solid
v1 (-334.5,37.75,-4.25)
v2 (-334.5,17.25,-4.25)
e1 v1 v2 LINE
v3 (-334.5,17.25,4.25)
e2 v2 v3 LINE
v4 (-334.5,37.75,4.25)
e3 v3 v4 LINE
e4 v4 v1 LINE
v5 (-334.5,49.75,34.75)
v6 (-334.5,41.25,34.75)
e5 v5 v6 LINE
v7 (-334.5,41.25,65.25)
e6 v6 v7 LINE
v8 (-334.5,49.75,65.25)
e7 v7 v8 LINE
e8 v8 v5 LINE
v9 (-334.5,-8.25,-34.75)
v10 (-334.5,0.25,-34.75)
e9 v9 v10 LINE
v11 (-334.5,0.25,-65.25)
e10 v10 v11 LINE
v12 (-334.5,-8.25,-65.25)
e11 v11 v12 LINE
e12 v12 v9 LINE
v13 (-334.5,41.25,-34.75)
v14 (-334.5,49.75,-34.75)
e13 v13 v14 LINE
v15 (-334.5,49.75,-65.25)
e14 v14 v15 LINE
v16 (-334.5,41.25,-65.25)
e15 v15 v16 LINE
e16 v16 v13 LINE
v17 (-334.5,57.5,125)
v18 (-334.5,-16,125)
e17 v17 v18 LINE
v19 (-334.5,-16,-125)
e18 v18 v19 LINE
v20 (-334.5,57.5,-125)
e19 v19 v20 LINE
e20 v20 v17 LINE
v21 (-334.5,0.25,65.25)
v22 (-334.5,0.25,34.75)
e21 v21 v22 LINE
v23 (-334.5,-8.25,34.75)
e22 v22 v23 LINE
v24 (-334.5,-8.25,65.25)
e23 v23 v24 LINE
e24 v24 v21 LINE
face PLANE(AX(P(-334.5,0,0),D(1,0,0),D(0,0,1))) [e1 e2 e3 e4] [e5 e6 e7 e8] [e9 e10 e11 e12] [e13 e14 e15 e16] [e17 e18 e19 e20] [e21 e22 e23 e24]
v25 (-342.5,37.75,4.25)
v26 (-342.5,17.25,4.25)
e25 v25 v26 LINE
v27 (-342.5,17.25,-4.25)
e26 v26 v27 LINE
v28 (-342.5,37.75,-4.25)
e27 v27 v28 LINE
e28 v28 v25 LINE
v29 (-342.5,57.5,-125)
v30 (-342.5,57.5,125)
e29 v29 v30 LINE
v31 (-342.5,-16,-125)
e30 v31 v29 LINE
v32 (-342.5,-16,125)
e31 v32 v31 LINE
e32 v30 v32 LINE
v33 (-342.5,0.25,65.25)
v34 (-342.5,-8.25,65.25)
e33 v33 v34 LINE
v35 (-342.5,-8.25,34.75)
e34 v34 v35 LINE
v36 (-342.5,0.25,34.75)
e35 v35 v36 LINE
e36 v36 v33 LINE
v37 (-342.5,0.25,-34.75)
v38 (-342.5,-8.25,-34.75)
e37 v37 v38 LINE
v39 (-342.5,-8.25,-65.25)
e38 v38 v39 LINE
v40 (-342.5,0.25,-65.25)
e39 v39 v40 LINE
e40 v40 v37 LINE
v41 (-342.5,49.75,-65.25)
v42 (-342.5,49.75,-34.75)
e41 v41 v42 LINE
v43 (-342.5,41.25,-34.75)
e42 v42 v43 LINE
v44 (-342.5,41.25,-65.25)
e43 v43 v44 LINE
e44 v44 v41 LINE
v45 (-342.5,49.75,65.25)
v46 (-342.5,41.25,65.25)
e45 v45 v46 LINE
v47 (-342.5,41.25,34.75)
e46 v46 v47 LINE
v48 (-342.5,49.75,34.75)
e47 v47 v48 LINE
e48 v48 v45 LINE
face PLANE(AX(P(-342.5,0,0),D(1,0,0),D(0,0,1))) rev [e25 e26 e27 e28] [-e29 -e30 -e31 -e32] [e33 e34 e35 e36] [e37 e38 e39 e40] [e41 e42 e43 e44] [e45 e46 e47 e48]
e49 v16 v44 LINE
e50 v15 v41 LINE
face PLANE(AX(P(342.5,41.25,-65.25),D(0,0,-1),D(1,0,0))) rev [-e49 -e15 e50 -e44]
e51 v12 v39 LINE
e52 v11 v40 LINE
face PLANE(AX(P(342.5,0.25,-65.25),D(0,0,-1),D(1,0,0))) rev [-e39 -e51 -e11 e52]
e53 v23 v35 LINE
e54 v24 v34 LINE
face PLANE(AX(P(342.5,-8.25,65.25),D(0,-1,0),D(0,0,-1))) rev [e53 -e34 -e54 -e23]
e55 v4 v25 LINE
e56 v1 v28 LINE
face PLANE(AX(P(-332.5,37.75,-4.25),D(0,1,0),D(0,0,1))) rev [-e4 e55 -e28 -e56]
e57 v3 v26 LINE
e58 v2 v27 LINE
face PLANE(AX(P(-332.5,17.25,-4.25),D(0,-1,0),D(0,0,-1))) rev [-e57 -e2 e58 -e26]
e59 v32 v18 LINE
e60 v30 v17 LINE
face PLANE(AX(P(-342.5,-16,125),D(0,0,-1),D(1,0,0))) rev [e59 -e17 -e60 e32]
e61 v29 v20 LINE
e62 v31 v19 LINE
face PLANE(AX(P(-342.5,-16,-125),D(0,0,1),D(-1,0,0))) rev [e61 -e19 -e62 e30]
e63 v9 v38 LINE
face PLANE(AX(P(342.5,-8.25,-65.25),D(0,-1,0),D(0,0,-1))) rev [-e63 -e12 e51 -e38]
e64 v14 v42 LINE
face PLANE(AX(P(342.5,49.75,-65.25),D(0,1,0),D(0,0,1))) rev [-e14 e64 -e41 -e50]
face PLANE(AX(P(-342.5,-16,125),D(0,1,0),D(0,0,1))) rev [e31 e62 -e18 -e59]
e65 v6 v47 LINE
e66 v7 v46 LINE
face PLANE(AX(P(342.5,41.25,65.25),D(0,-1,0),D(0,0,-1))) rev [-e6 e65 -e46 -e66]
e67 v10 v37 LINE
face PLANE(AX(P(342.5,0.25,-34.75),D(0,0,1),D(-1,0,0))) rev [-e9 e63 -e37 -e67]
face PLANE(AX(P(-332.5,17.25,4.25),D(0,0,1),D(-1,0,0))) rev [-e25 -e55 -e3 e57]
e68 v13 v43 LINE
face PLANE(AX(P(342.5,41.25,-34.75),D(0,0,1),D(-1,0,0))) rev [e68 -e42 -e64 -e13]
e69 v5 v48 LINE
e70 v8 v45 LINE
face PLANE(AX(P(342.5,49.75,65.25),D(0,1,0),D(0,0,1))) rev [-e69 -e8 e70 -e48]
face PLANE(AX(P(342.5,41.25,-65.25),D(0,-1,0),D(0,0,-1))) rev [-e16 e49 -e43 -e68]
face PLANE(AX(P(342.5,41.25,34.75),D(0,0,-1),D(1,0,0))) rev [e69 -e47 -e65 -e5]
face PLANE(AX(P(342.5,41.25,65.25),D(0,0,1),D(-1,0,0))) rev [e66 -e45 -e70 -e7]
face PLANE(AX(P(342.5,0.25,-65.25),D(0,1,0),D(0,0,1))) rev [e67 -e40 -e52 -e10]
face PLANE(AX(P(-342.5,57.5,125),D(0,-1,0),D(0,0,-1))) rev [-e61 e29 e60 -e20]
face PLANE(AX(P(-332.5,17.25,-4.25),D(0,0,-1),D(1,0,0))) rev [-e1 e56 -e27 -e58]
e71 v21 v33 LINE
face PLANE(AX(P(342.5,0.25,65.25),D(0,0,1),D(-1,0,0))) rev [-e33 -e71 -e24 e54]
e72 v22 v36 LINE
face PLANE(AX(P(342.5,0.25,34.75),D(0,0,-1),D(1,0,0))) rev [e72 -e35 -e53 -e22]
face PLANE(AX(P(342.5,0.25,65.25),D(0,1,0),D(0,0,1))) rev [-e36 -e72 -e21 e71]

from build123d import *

# Parameters (mm, degrees)
SKETCH1_W           = 685
SKETCH1_H           = 250
BASE_FLANGE1_DEPTH  = 8
SKETCH6_W           = 60
SKETCH6_H           = 8
SKETCH6_W_2         = 70
EXTRUDE1_DEPTH      = 8
SKETCH7_W           = 250
SKETCH7_H           = 73.5
BASE_FLANGE2_DEPTH  = 8
SKETCH12_W          = 30.5
SKETCH12_H          = 8.5
EXTRUDE2_DEPTH      = 699.681794525
SKETCH14_W          = 250
SKETCH14_H          = 8
BASE_FLANGE3_DEPTH  = 50.5
SKETCH19_W          = 60
SKETCH19_H          = 8
SKETCH19_W_2        = 70
EXTRUDE3_DEPTH      = 8
BREAK_CORNER1_START = 41.5
BREAK_CORNER1_DEPTH = 8
EXTRUDE4_DEPTH      = 8
BASE_FLANGE4_DEPTH  = 8
SKETCH38_W          = 8.5
SKETCH38_H          = 20.5
EXTRUDE5_DEPTH      = 10
SKETCH39_W          = 20.5
SKETCH39_H          = 8.5
EXTRUDE6_DEPTH      = 10


# Read off the part's stored shape, not the designer's step: Break-Corner1
# Sheet-metal steps are written as plain solids
with BuildPart() as part:
    # Sketch1 → Base-Flange1 (new body)
    with BuildSketch(Plane(origin=(0, 0, 0), x_dir=(1, 0, 0), z_dir=(0, 1, 0))):
        Rectangle(SKETCH1_W, SKETCH1_H)
    extrude(amount=-BASE_FLANGE1_DEPTH)

    # Sketch6 → Extrude1 (cut)
    with BuildSketch(Plane(origin=(342.5, 0, 0), x_dir=(0, 0, -1), z_dir=(1, 0, 0))):
        with Locations((-95, -4)):
            Rectangle(SKETCH6_W, SKETCH6_H)
        with Locations((95, -4)):
            Rectangle(SKETCH6_W, SKETCH6_H)
        with Locations((0, -4)):
            Rectangle(SKETCH6_W_2, SKETCH6_H)
    extrude1 = extrude(amount=-EXTRUDE1_DEPTH, mode=Mode.SUBTRACT)

    # Mirror1: Extrude1 across plane
    add(extrude1.mirror(Plane(origin=(0, 0, 0), x_dir=(0, 0, 1), z_dir=(1, 0, 0))), mode=Mode.SUBTRACT)

    # Sketch39 → Extrude6 (cut)
    with BuildSketch(Plane.XZ.offset(8)):
        with Locations((289.5, 0)):
            Rectangle(SKETCH39_W, SKETCH39_H)
        with Locations((229.5, 0)):
            Rectangle(SKETCH39_W, SKETCH39_H)
        with Locations((-289.5, 0)):
            Rectangle(SKETCH39_W, SKETCH39_H)
        with Locations((-229.5, 0)):
            Rectangle(SKETCH39_W, SKETCH39_H)
    extrude(amount=-EXTRUDE6_DEPTH, mode=Mode.SUBTRACT)


with BuildPart() as body_2:
    # Sketch7 → Base-Flange2 (new body)
    with BuildSketch(Plane(origin=(334.5, 0, 0), x_dir=(0, 0, -1), z_dir=(1, 0, 0))):
        with Locations((0, 20.75)):
            Rectangle(SKETCH7_W, SKETCH7_H)
    extrude(amount=BASE_FLANGE2_DEPTH)

    # Sketch12 → Extrude2 (cut, through all)
    with BuildSketch(Plane(origin=(342.5, 0, 0), x_dir=(0, 0, -1), z_dir=(1, 0, 0))):
        with Locations((-50, -4)):
            Rectangle(SKETCH12_W, SKETCH12_H)
        with Locations((50, -4)):
            Rectangle(SKETCH12_W, SKETCH12_H)
        with Locations((50, 45.5)):
            Rectangle(SKETCH12_W, SKETCH12_H)
        with Locations((-50, 45.5)):
            Rectangle(SKETCH12_W, SKETCH12_H)
    extrude(amount=-EXTRUDE2_DEPTH, mode=Mode.SUBTRACT)

    # Sketch38 → Extrude5 (cut)
    with BuildSketch(Plane(origin=(342.5, 0, 0), x_dir=(0, 0, -1), z_dir=(1, 0, 0))):
        with Locations((0, 27.5)):
            Rectangle(SKETCH38_W, SKETCH38_H)
    extrude(amount=-EXTRUDE5_DEPTH, mode=Mode.SUBTRACT)


with BuildPart() as body_3:
    # Sketch14 → Base-Flange3 (new body)
    with BuildSketch(Plane.ZY.offset(-334.5)):
        with Locations((0, 45.5)):
            Rectangle(SKETCH14_W, SKETCH14_H)
    extrude(amount=-BASE_FLANGE3_DEPTH)

    # Sketch19 → Extrude3 (cut)
    with BuildSketch(Plane(origin=(342.5, 0, 0), x_dir=(0, 0, -1), z_dir=(1, 0, 0))):
        with Locations((95, 45.5)):
            Rectangle(SKETCH19_W, SKETCH19_H)
        with Locations((0, 45.5)):
            Rectangle(SKETCH19_W_2, SKETCH19_H)
        with Locations((-95, 45.5)):
            Rectangle(SKETCH19_W, SKETCH19_H)
    extrude(amount=-EXTRUDE3_DEPTH, mode=Mode.SUBTRACT)

    # Break-Corner1 outline → Break-Corner1 (cut)
    with BuildSketch(Plane(origin=(0, 0, 0), x_dir=(1, 0, 0), z_dir=(0, 1, 0)).offset(BREAK_CORNER1_START)):
        Polygon((385, -125), (385, -110), (370, -125), align=None)
        Polygon((370, 125), (385, 110), (385, 125), align=None)
    extrude(amount=BREAK_CORNER1_DEPTH, mode=Mode.SUBTRACT)

    # Sketch20 → Extrude4 (cut)
    with BuildSketch(Plane(origin=(0, 49.5, 0), x_dir=(1, 0, 0), z_dir=(0, 1, 0))):
        with BuildLine():
            Line((367, 75), (367, 55))
            ThreePointArc((367, 55), (362.5, 50.5), (358, 55))
            Line((358, 55), (358, 75))
            ThreePointArc((358, 75), (362.5, 79.5), (367, 75))
        make_face()
        with BuildLine():
            Line((367, -75), (367, -55))
            ThreePointArc((367, -55), (362.5, -50.5), (358, -55))
            Line((358, -55), (358, -75))
            ThreePointArc((358, -75), (362.5, -79.5), (367, -75))
        make_face()
    extrude(amount=-EXTRUDE4_DEPTH, mode=Mode.SUBTRACT)


with BuildPart() as body_4:
    # Mirror4: mirrored copy
    add(body_3.part.mirror(Plane(origin=(0, 0, 0), x_dir=(0, 0, 1), z_dir=(1, 0, 0))))


with BuildPart() as body_5:
    # Sketch29 → Base-Flange4 (new body)
    with BuildSketch(Plane.XY.offset(4)):
        Polygon((219.5, 0), (219.5, -8), (239.5, -8), (239.5, 0), (279.5, 0), (279.5, -8), (299.5, -8), (299.5, 0), (334.5, 0), (334.5, 17.5), (342.5, 17.5), (342.5, 37.5), (334.5, 37.5), (334.5, 57.5), (194.5, 10), (194.5, 0), align=None)
    extrude(amount=-BASE_FLANGE4_DEPTH)


with BuildPart() as body_6:
    # Mirror5: mirrored copy
    add(body_5.part.mirror(Plane(origin=(0, 0, 0), x_dir=(0, 0, 1), z_dir=(1, 0, 0))))


with BuildPart() as body_7:
    # Mirror3: mirrored copy
    add(body_2.part.mirror(Plane(origin=(0, 0, 0), x_dir=(0, 0, 1), z_dir=(1, 0, 0))))


solid = body_7.part
